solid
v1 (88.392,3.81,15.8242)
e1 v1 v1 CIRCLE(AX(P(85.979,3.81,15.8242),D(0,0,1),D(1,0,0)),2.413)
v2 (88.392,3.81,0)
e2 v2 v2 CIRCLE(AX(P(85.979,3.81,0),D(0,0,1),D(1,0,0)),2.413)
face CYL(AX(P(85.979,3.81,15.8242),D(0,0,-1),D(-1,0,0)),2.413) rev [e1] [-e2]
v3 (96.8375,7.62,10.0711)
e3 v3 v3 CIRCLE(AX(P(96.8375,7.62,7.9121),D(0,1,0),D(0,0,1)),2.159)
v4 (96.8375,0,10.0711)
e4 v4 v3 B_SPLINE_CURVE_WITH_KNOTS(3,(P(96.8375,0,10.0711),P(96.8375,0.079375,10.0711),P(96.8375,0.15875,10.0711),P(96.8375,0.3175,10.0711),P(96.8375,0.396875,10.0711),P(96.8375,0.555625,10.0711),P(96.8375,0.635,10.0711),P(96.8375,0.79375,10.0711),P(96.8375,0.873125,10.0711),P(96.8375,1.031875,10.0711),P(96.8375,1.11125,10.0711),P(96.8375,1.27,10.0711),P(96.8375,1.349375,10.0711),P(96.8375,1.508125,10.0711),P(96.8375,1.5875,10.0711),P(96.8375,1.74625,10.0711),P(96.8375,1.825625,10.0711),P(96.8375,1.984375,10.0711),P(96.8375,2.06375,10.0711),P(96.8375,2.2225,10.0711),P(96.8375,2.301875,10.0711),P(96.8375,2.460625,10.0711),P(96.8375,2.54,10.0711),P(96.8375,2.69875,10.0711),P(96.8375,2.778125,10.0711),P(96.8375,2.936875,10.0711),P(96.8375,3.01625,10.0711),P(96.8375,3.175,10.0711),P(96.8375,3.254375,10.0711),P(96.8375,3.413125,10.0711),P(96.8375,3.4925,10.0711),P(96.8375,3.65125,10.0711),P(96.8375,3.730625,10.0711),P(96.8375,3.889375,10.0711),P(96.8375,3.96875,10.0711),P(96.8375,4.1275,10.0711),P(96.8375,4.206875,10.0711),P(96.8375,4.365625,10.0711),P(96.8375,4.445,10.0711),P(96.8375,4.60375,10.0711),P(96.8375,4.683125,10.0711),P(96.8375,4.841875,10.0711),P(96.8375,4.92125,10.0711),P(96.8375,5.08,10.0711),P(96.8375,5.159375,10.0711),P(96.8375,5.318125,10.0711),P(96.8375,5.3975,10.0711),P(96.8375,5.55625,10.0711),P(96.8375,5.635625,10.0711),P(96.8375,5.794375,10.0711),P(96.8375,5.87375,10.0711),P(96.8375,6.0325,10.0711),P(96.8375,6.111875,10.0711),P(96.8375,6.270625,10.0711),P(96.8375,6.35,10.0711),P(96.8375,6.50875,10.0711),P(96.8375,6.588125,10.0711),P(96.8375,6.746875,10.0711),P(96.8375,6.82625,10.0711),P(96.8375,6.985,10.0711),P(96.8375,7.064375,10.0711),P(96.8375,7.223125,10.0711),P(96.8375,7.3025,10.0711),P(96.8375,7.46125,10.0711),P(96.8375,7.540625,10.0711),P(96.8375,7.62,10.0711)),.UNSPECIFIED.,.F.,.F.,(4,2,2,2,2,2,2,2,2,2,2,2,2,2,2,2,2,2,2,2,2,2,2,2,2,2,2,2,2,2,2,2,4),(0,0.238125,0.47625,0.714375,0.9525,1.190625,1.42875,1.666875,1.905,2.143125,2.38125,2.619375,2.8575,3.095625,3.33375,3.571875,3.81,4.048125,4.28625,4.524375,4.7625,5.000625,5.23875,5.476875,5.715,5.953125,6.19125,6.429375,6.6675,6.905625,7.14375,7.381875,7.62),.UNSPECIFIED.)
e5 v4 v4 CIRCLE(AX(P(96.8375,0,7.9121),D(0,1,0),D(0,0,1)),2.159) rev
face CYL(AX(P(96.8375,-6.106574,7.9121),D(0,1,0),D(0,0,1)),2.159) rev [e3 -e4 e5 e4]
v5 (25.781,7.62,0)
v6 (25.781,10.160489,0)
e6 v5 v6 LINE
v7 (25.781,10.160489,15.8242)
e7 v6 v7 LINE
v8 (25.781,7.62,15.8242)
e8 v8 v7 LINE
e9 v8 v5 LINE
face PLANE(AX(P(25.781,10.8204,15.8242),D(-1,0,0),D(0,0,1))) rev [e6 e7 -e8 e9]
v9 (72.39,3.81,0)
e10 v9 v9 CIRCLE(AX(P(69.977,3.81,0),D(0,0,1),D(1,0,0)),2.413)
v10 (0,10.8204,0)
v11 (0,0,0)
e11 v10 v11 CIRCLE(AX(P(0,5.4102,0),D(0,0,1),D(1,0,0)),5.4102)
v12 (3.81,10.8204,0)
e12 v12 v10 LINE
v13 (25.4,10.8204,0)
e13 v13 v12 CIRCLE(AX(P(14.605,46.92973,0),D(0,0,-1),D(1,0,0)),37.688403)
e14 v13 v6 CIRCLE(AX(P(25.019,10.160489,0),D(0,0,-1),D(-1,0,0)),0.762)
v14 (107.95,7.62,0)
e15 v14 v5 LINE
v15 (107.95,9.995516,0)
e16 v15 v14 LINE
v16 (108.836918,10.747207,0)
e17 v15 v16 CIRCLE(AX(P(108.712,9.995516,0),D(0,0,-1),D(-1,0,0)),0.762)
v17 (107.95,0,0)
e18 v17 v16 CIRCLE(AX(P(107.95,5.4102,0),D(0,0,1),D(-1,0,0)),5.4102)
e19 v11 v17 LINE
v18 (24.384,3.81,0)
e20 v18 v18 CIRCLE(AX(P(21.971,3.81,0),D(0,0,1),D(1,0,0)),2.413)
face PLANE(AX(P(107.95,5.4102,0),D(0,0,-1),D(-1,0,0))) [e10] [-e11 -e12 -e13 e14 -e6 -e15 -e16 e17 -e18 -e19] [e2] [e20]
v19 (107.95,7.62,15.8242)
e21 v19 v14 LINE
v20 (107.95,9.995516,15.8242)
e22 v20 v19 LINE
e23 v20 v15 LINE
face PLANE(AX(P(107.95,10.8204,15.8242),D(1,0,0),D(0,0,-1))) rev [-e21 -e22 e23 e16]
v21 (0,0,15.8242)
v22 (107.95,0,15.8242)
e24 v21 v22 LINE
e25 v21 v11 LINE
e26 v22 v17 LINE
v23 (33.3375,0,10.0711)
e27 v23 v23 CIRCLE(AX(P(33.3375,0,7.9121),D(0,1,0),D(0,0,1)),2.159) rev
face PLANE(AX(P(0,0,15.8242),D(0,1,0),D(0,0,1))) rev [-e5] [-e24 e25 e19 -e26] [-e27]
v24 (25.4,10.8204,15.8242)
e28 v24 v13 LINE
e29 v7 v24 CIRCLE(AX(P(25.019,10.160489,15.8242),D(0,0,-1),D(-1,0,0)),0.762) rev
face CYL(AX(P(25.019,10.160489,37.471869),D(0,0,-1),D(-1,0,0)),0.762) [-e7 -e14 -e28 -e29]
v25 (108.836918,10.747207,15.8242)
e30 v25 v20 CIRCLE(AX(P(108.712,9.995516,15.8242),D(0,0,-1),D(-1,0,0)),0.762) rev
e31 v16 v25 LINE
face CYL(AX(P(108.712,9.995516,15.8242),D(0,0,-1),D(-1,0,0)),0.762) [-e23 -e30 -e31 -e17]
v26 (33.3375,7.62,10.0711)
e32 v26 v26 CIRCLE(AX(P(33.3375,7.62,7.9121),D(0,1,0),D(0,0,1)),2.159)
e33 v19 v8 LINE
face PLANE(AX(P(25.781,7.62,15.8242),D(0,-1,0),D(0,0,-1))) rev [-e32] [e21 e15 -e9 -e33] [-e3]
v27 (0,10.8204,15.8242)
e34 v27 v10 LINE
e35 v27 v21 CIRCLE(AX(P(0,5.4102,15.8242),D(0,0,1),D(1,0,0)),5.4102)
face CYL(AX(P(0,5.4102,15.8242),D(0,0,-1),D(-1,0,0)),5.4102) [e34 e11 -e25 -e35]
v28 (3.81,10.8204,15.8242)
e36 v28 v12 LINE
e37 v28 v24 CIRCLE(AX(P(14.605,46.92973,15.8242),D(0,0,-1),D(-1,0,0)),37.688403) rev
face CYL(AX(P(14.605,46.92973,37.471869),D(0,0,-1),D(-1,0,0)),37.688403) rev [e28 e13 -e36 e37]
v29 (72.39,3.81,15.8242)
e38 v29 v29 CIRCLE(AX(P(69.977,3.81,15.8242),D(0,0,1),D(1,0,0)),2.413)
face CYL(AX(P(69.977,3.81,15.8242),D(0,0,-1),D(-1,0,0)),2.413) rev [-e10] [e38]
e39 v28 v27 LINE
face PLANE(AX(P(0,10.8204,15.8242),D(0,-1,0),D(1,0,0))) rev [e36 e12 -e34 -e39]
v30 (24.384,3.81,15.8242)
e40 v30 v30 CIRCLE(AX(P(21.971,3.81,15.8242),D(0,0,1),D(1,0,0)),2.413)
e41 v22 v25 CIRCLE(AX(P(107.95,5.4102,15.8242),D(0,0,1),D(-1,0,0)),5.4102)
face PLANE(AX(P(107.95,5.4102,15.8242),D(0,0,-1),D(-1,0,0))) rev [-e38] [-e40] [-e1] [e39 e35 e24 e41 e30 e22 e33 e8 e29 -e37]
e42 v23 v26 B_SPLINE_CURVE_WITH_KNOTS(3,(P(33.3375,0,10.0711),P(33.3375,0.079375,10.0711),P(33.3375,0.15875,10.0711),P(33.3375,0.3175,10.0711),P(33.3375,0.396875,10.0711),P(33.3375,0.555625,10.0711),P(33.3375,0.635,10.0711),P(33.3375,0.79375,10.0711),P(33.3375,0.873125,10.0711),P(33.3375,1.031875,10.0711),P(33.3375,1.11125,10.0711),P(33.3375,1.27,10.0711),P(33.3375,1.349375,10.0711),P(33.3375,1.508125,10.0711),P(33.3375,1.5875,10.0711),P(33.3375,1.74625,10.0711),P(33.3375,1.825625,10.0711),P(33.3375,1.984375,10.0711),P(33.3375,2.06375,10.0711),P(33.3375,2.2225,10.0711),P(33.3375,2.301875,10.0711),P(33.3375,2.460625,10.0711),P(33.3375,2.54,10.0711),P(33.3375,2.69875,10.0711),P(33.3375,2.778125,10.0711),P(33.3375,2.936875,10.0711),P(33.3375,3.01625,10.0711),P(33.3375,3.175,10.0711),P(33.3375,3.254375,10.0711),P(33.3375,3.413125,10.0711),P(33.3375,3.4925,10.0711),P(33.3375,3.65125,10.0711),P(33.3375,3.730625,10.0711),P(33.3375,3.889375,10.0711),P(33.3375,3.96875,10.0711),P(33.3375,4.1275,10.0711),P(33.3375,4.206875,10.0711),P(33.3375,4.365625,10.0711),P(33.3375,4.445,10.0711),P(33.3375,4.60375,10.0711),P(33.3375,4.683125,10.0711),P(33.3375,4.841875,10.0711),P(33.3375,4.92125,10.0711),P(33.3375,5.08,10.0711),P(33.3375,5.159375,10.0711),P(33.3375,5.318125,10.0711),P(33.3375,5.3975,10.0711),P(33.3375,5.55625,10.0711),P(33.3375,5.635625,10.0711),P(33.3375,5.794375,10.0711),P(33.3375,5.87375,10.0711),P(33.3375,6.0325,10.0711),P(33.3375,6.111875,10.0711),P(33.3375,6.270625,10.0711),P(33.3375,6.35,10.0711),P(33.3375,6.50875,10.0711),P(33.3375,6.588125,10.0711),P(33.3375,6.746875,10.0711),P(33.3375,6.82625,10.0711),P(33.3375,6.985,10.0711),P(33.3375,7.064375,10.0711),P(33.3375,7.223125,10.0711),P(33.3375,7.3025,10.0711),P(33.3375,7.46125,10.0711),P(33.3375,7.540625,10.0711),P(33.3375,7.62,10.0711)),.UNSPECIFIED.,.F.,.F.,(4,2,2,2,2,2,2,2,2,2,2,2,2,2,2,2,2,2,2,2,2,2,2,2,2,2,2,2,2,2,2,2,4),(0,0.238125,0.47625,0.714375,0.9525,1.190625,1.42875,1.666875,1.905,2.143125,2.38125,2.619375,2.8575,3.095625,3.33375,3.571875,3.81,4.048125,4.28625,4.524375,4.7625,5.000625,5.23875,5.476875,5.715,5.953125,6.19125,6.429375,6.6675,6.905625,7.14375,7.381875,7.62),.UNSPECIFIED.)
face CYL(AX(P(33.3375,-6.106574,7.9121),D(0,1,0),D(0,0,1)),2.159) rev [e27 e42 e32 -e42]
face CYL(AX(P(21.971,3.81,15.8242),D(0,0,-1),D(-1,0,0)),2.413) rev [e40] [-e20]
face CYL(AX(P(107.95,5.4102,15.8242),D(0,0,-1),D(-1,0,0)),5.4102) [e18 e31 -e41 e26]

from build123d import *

# Parameters (mm, degrees)
SKETCH1_R           = 2.413
BOSS_EXTRUDE1_DEPTH = 15.8242
SKETCH3_R           = 2.159
CUT_EXTRUDE1_DEPTH  = 7.62
CUT_EXTRUDE2_DEPTH  = 15.8242
FILLET1_R           = 0.762


with BuildPart() as part:
    # Sketch1 → Boss-Extrude1 (new body)
    with BuildSketch(Plane.XY):
        with BuildLine():
            Line((0, 0), (107.95, 0))
            ThreePointArc((107.95, 0), (113.3602, 5.4102), (107.95, 10.8204))
            Line((107.95, 10.8204), (107.95, 7.62))
            Line((107.95, 7.62), (25.781, 7.62))
            Line((25.781, 7.62), (25.781, 10.8204))
            Line((25.781, 10.8204), (0, 10.8204))
            ThreePointArc((0, 10.8204), (-5.4102, 5.4102), (0, 0))
        make_face()
        with Locations((21.971, 3.81)):
            Circle(SKETCH1_R, mode=Mode.SUBTRACT)
        with Locations((69.977, 3.81)):
            Circle(SKETCH1_R, mode=Mode.SUBTRACT)
        with Locations((85.979, 3.81)):
            Circle(SKETCH1_R, mode=Mode.SUBTRACT)
    extrude(amount=BOSS_EXTRUDE1_DEPTH)

    # Sketch3 → Cut-Extrude1 (cut)
    with BuildSketch(Plane(origin=(0, 7.62, 0), x_dir=(1, 0, 0), z_dir=(0, 1, 0))):
        with Locations(Location((96.8375, -7.9121, 0), (0, 0, 270))):
            Circle(SKETCH3_R)
        with Locations(Location((33.3375, -7.9121, 0), (0, 0, 270))):
            Circle(SKETCH3_R)
    extrude(amount=-CUT_EXTRUDE1_DEPTH, mode=Mode.SUBTRACT)

    # Sketch4 → Cut-Extrude2 (cut)
    with BuildSketch(Plane(origin=(0, 0, 0), x_dir=(-1, 0, 0), z_dir=(0, 0, -1))):
        with BuildLine():
            Line((-3.81, 10.8204), (-25.4, 10.8204))
            ThreePointArc((-25.4, 10.8204), (-14.605, 9.241326758), (-3.81, 10.8204))
        make_face()
    extrude(amount=-CUT_EXTRUDE2_DEPTH, mode=Mode.SUBTRACT)

    # Fillet1
    # the kernel refuses this fillet: 0.762 mm, written as the material it takes off along each edge
    with BuildSketch(Plane(origin=(107.95, 10.8204, -2.224832658), x_dir=(0.9966120705297453, -0.08224585627503565, 0), z_dir=(0, 0, 1))) as fillet1_piece_1:
        with BuildLine():
            CenterArc((0.827261721, -0.759418398), FILLET1_R, 85.282330638, 99.435338723)
            Line((0.067843323, -0.82208974), (0.052654955, -0.823343167))
            Line((0.052654955, -0.823343167), (-0.015188368, -0.001253427))
            Line((-0.015188368, -0.001253427), (-0.001253427, 0.015188368))
            ThreePointArc((-0.001253427, 0.015188368), (0.444966532, 0.033569376), (0.89118649, 0.015188368))
            Line((0.89118649, 0.015188368), (0.889933063, 0))
        make_face()
    extrude(amount=20.273865316, mode=Mode.SUBTRACT)
    with BuildSketch(Plane(origin=(25.781, 10.8204, -1.649778394), x_dir=(-1, 0, 0), z_dir=(0, 0, 1))) as fillet1_piece_2:
        with BuildLine():
            CenterArc((0.762, 0.659911358), FILLET1_R, 180, 60)
            Line((0, 0.659911358), (-0.01524, 0.659911358))
            Line((-0.01524, 0.659911358), (-0.01524, 0))
            Line((-0.01524, 0), (0, -0.01524))
            ThreePointArc((0, -0.01524), (0.1905, -0.01524), (0.37338, -0.013198227))
            Line((0.37338, -0.013198227), (0.381, 0))
        make_face()
    extrude(amount=19.123756788, mode=Mode.SUBTRACT)


solid = part.part
